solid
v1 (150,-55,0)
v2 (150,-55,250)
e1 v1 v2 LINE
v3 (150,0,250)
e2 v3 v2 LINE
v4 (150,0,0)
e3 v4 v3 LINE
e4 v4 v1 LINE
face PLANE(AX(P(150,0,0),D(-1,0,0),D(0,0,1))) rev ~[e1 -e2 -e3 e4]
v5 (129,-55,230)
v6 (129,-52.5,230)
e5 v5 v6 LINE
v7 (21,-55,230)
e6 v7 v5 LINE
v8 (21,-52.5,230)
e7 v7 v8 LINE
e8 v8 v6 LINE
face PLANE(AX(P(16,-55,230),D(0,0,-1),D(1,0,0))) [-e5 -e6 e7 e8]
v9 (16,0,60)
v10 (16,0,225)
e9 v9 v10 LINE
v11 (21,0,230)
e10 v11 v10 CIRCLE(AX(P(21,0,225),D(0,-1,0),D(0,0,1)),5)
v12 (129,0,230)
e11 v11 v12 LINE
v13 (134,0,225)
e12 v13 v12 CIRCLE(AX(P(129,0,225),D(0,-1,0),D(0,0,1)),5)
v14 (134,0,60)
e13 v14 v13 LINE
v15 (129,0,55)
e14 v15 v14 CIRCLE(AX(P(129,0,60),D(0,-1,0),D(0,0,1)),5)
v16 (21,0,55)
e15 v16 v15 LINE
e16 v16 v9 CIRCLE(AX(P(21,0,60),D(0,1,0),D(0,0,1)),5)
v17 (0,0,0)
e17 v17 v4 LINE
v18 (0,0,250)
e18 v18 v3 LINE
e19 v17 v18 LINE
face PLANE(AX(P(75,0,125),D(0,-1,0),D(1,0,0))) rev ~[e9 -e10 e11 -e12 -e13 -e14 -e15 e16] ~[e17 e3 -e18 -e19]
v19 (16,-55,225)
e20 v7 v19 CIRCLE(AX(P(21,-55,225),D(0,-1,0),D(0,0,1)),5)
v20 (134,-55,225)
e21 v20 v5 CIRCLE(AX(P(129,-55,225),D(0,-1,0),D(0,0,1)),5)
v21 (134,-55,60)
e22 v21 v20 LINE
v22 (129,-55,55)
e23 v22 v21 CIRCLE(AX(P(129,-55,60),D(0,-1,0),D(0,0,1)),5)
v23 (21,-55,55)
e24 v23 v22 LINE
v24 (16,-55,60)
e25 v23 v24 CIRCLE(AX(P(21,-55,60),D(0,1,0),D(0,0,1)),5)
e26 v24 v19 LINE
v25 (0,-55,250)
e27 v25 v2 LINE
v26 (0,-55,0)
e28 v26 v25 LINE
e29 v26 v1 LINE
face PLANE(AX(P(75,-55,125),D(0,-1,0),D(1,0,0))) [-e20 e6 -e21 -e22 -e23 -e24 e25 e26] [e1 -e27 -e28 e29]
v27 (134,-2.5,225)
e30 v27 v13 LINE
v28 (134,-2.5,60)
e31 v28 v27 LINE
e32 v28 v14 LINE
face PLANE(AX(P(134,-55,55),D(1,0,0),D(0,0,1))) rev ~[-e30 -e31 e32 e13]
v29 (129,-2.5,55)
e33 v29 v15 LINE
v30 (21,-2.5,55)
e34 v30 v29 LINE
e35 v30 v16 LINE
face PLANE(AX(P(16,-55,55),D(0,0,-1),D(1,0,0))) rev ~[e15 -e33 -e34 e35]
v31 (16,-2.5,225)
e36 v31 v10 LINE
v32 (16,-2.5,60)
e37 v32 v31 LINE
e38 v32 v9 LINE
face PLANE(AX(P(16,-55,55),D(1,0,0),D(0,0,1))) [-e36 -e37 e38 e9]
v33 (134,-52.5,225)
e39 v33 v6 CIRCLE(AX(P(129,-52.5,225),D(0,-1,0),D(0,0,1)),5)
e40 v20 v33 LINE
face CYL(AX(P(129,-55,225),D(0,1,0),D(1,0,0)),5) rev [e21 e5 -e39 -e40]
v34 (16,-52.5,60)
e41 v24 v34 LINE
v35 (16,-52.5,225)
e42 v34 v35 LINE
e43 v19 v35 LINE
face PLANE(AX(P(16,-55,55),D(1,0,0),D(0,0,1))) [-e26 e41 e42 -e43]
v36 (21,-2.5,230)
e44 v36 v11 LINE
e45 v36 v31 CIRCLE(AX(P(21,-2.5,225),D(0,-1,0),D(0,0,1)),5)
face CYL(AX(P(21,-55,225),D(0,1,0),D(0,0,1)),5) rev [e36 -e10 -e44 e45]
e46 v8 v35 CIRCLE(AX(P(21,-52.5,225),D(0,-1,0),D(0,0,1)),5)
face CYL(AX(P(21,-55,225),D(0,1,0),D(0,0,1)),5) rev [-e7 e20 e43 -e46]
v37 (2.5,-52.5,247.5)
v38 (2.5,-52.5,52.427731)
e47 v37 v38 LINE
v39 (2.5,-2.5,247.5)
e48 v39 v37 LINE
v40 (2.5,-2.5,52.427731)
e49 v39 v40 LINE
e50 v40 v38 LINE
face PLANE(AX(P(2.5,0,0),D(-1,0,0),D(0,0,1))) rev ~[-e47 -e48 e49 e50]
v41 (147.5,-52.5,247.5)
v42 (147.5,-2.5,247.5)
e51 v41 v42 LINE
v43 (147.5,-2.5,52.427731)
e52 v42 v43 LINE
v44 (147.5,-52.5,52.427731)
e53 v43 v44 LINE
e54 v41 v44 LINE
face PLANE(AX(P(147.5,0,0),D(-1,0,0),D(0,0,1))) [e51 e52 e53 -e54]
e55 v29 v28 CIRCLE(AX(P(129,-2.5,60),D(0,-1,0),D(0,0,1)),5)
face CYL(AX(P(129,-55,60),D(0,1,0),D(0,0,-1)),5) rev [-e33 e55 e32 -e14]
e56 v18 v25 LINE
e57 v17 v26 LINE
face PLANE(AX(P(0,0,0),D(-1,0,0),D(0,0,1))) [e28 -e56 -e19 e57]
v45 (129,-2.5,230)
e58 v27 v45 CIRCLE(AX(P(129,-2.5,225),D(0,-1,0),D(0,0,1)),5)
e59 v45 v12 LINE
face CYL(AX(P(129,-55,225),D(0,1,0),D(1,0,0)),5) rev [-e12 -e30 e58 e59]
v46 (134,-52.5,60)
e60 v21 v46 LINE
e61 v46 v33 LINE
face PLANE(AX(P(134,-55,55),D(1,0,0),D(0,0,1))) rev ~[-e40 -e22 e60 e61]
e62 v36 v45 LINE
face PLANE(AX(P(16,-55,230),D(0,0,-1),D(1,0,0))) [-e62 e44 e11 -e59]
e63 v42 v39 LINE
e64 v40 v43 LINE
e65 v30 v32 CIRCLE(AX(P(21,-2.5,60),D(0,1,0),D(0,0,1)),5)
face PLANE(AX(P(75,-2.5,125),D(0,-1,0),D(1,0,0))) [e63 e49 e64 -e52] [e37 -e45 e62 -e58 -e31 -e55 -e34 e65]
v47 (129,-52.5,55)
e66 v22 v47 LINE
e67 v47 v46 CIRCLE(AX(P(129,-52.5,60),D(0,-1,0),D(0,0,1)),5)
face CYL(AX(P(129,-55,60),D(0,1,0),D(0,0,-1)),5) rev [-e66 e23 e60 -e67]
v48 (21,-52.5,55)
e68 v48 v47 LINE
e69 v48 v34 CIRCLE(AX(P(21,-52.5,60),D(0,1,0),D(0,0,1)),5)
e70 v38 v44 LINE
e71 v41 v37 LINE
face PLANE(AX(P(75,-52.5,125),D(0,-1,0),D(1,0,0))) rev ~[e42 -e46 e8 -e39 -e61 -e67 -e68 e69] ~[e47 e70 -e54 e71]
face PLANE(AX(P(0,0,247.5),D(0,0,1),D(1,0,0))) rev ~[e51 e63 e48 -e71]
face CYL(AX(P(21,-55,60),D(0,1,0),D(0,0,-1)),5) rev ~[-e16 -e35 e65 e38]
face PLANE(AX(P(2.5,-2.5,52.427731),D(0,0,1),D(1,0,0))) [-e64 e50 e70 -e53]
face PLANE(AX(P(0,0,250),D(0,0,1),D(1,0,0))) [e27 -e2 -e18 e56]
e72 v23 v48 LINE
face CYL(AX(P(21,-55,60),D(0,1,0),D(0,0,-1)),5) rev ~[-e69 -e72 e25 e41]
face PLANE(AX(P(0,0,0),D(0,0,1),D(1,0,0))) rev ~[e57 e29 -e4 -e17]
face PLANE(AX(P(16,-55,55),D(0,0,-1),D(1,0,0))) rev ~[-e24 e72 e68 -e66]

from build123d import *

# Parameters (mm, degrees)
F0_W     = 150
F0_H     = 250
F1_DEPTH = 55
F2_W     = 118
F2_H     = 175
F3_DEPTH = 55.001
F4_R     = 5
F5_T     = -2.5
F6_W     = 145
F6_H     = 49.9277314544
F7_DEPTH = 50


with BuildPart() as f1:
    # F0 (on Front) → F1 (new body)
    with BuildSketch(Plane.XZ):
        with Locations((75, 125)):
            Rectangle(F0_W, F0_H)
    extrude(amount=F1_DEPTH)

    # F2 (on face) → F3 (cut, through all)
    with BuildSketch(Plane.XZ.offset(55)):
        with Locations((75, 142.5)):
            Rectangle(F2_W, F2_H)
    extrude(amount=-F3_DEPTH, mode=Mode.SUBTRACT)

    # F4
    f4_edges = [f1.edges().sort_by_distance(p)[0] for p in [
        (16, -27.5, 230),
        (134, -27.5, 230),
        (134, -27.5, 55),
        (16, -27.5, 55),
    ]]
    fillet(f4_edges, radius=F4_R)

    # F5
    f5_openings = [f1.faces().sort_by_distance(p)[0] for p in [
        (16, -27.5, 142.5),
        (17.464466, -27.5, 56.464466),
        (75, -27.5, 55),
        (132.535534, -27.5, 56.464466),
        (134, -27.5, 142.5),
        (17.464466, -27.5, 228.535534),
        (75, -27.5, 230),
        (132.535534, -27.5, 228.535534),
    ]]
    offset(amount=F5_T, openings=f5_openings)

    # F6 (on face) → F7 (join, through all)
    with BuildSketch(Plane.XZ.offset(2.5)):
        with Locations((75, 27.4638657272)):
            Rectangle(F6_W, F6_H)
    extrude(amount=F7_DEPTH)


solid = f1.part
